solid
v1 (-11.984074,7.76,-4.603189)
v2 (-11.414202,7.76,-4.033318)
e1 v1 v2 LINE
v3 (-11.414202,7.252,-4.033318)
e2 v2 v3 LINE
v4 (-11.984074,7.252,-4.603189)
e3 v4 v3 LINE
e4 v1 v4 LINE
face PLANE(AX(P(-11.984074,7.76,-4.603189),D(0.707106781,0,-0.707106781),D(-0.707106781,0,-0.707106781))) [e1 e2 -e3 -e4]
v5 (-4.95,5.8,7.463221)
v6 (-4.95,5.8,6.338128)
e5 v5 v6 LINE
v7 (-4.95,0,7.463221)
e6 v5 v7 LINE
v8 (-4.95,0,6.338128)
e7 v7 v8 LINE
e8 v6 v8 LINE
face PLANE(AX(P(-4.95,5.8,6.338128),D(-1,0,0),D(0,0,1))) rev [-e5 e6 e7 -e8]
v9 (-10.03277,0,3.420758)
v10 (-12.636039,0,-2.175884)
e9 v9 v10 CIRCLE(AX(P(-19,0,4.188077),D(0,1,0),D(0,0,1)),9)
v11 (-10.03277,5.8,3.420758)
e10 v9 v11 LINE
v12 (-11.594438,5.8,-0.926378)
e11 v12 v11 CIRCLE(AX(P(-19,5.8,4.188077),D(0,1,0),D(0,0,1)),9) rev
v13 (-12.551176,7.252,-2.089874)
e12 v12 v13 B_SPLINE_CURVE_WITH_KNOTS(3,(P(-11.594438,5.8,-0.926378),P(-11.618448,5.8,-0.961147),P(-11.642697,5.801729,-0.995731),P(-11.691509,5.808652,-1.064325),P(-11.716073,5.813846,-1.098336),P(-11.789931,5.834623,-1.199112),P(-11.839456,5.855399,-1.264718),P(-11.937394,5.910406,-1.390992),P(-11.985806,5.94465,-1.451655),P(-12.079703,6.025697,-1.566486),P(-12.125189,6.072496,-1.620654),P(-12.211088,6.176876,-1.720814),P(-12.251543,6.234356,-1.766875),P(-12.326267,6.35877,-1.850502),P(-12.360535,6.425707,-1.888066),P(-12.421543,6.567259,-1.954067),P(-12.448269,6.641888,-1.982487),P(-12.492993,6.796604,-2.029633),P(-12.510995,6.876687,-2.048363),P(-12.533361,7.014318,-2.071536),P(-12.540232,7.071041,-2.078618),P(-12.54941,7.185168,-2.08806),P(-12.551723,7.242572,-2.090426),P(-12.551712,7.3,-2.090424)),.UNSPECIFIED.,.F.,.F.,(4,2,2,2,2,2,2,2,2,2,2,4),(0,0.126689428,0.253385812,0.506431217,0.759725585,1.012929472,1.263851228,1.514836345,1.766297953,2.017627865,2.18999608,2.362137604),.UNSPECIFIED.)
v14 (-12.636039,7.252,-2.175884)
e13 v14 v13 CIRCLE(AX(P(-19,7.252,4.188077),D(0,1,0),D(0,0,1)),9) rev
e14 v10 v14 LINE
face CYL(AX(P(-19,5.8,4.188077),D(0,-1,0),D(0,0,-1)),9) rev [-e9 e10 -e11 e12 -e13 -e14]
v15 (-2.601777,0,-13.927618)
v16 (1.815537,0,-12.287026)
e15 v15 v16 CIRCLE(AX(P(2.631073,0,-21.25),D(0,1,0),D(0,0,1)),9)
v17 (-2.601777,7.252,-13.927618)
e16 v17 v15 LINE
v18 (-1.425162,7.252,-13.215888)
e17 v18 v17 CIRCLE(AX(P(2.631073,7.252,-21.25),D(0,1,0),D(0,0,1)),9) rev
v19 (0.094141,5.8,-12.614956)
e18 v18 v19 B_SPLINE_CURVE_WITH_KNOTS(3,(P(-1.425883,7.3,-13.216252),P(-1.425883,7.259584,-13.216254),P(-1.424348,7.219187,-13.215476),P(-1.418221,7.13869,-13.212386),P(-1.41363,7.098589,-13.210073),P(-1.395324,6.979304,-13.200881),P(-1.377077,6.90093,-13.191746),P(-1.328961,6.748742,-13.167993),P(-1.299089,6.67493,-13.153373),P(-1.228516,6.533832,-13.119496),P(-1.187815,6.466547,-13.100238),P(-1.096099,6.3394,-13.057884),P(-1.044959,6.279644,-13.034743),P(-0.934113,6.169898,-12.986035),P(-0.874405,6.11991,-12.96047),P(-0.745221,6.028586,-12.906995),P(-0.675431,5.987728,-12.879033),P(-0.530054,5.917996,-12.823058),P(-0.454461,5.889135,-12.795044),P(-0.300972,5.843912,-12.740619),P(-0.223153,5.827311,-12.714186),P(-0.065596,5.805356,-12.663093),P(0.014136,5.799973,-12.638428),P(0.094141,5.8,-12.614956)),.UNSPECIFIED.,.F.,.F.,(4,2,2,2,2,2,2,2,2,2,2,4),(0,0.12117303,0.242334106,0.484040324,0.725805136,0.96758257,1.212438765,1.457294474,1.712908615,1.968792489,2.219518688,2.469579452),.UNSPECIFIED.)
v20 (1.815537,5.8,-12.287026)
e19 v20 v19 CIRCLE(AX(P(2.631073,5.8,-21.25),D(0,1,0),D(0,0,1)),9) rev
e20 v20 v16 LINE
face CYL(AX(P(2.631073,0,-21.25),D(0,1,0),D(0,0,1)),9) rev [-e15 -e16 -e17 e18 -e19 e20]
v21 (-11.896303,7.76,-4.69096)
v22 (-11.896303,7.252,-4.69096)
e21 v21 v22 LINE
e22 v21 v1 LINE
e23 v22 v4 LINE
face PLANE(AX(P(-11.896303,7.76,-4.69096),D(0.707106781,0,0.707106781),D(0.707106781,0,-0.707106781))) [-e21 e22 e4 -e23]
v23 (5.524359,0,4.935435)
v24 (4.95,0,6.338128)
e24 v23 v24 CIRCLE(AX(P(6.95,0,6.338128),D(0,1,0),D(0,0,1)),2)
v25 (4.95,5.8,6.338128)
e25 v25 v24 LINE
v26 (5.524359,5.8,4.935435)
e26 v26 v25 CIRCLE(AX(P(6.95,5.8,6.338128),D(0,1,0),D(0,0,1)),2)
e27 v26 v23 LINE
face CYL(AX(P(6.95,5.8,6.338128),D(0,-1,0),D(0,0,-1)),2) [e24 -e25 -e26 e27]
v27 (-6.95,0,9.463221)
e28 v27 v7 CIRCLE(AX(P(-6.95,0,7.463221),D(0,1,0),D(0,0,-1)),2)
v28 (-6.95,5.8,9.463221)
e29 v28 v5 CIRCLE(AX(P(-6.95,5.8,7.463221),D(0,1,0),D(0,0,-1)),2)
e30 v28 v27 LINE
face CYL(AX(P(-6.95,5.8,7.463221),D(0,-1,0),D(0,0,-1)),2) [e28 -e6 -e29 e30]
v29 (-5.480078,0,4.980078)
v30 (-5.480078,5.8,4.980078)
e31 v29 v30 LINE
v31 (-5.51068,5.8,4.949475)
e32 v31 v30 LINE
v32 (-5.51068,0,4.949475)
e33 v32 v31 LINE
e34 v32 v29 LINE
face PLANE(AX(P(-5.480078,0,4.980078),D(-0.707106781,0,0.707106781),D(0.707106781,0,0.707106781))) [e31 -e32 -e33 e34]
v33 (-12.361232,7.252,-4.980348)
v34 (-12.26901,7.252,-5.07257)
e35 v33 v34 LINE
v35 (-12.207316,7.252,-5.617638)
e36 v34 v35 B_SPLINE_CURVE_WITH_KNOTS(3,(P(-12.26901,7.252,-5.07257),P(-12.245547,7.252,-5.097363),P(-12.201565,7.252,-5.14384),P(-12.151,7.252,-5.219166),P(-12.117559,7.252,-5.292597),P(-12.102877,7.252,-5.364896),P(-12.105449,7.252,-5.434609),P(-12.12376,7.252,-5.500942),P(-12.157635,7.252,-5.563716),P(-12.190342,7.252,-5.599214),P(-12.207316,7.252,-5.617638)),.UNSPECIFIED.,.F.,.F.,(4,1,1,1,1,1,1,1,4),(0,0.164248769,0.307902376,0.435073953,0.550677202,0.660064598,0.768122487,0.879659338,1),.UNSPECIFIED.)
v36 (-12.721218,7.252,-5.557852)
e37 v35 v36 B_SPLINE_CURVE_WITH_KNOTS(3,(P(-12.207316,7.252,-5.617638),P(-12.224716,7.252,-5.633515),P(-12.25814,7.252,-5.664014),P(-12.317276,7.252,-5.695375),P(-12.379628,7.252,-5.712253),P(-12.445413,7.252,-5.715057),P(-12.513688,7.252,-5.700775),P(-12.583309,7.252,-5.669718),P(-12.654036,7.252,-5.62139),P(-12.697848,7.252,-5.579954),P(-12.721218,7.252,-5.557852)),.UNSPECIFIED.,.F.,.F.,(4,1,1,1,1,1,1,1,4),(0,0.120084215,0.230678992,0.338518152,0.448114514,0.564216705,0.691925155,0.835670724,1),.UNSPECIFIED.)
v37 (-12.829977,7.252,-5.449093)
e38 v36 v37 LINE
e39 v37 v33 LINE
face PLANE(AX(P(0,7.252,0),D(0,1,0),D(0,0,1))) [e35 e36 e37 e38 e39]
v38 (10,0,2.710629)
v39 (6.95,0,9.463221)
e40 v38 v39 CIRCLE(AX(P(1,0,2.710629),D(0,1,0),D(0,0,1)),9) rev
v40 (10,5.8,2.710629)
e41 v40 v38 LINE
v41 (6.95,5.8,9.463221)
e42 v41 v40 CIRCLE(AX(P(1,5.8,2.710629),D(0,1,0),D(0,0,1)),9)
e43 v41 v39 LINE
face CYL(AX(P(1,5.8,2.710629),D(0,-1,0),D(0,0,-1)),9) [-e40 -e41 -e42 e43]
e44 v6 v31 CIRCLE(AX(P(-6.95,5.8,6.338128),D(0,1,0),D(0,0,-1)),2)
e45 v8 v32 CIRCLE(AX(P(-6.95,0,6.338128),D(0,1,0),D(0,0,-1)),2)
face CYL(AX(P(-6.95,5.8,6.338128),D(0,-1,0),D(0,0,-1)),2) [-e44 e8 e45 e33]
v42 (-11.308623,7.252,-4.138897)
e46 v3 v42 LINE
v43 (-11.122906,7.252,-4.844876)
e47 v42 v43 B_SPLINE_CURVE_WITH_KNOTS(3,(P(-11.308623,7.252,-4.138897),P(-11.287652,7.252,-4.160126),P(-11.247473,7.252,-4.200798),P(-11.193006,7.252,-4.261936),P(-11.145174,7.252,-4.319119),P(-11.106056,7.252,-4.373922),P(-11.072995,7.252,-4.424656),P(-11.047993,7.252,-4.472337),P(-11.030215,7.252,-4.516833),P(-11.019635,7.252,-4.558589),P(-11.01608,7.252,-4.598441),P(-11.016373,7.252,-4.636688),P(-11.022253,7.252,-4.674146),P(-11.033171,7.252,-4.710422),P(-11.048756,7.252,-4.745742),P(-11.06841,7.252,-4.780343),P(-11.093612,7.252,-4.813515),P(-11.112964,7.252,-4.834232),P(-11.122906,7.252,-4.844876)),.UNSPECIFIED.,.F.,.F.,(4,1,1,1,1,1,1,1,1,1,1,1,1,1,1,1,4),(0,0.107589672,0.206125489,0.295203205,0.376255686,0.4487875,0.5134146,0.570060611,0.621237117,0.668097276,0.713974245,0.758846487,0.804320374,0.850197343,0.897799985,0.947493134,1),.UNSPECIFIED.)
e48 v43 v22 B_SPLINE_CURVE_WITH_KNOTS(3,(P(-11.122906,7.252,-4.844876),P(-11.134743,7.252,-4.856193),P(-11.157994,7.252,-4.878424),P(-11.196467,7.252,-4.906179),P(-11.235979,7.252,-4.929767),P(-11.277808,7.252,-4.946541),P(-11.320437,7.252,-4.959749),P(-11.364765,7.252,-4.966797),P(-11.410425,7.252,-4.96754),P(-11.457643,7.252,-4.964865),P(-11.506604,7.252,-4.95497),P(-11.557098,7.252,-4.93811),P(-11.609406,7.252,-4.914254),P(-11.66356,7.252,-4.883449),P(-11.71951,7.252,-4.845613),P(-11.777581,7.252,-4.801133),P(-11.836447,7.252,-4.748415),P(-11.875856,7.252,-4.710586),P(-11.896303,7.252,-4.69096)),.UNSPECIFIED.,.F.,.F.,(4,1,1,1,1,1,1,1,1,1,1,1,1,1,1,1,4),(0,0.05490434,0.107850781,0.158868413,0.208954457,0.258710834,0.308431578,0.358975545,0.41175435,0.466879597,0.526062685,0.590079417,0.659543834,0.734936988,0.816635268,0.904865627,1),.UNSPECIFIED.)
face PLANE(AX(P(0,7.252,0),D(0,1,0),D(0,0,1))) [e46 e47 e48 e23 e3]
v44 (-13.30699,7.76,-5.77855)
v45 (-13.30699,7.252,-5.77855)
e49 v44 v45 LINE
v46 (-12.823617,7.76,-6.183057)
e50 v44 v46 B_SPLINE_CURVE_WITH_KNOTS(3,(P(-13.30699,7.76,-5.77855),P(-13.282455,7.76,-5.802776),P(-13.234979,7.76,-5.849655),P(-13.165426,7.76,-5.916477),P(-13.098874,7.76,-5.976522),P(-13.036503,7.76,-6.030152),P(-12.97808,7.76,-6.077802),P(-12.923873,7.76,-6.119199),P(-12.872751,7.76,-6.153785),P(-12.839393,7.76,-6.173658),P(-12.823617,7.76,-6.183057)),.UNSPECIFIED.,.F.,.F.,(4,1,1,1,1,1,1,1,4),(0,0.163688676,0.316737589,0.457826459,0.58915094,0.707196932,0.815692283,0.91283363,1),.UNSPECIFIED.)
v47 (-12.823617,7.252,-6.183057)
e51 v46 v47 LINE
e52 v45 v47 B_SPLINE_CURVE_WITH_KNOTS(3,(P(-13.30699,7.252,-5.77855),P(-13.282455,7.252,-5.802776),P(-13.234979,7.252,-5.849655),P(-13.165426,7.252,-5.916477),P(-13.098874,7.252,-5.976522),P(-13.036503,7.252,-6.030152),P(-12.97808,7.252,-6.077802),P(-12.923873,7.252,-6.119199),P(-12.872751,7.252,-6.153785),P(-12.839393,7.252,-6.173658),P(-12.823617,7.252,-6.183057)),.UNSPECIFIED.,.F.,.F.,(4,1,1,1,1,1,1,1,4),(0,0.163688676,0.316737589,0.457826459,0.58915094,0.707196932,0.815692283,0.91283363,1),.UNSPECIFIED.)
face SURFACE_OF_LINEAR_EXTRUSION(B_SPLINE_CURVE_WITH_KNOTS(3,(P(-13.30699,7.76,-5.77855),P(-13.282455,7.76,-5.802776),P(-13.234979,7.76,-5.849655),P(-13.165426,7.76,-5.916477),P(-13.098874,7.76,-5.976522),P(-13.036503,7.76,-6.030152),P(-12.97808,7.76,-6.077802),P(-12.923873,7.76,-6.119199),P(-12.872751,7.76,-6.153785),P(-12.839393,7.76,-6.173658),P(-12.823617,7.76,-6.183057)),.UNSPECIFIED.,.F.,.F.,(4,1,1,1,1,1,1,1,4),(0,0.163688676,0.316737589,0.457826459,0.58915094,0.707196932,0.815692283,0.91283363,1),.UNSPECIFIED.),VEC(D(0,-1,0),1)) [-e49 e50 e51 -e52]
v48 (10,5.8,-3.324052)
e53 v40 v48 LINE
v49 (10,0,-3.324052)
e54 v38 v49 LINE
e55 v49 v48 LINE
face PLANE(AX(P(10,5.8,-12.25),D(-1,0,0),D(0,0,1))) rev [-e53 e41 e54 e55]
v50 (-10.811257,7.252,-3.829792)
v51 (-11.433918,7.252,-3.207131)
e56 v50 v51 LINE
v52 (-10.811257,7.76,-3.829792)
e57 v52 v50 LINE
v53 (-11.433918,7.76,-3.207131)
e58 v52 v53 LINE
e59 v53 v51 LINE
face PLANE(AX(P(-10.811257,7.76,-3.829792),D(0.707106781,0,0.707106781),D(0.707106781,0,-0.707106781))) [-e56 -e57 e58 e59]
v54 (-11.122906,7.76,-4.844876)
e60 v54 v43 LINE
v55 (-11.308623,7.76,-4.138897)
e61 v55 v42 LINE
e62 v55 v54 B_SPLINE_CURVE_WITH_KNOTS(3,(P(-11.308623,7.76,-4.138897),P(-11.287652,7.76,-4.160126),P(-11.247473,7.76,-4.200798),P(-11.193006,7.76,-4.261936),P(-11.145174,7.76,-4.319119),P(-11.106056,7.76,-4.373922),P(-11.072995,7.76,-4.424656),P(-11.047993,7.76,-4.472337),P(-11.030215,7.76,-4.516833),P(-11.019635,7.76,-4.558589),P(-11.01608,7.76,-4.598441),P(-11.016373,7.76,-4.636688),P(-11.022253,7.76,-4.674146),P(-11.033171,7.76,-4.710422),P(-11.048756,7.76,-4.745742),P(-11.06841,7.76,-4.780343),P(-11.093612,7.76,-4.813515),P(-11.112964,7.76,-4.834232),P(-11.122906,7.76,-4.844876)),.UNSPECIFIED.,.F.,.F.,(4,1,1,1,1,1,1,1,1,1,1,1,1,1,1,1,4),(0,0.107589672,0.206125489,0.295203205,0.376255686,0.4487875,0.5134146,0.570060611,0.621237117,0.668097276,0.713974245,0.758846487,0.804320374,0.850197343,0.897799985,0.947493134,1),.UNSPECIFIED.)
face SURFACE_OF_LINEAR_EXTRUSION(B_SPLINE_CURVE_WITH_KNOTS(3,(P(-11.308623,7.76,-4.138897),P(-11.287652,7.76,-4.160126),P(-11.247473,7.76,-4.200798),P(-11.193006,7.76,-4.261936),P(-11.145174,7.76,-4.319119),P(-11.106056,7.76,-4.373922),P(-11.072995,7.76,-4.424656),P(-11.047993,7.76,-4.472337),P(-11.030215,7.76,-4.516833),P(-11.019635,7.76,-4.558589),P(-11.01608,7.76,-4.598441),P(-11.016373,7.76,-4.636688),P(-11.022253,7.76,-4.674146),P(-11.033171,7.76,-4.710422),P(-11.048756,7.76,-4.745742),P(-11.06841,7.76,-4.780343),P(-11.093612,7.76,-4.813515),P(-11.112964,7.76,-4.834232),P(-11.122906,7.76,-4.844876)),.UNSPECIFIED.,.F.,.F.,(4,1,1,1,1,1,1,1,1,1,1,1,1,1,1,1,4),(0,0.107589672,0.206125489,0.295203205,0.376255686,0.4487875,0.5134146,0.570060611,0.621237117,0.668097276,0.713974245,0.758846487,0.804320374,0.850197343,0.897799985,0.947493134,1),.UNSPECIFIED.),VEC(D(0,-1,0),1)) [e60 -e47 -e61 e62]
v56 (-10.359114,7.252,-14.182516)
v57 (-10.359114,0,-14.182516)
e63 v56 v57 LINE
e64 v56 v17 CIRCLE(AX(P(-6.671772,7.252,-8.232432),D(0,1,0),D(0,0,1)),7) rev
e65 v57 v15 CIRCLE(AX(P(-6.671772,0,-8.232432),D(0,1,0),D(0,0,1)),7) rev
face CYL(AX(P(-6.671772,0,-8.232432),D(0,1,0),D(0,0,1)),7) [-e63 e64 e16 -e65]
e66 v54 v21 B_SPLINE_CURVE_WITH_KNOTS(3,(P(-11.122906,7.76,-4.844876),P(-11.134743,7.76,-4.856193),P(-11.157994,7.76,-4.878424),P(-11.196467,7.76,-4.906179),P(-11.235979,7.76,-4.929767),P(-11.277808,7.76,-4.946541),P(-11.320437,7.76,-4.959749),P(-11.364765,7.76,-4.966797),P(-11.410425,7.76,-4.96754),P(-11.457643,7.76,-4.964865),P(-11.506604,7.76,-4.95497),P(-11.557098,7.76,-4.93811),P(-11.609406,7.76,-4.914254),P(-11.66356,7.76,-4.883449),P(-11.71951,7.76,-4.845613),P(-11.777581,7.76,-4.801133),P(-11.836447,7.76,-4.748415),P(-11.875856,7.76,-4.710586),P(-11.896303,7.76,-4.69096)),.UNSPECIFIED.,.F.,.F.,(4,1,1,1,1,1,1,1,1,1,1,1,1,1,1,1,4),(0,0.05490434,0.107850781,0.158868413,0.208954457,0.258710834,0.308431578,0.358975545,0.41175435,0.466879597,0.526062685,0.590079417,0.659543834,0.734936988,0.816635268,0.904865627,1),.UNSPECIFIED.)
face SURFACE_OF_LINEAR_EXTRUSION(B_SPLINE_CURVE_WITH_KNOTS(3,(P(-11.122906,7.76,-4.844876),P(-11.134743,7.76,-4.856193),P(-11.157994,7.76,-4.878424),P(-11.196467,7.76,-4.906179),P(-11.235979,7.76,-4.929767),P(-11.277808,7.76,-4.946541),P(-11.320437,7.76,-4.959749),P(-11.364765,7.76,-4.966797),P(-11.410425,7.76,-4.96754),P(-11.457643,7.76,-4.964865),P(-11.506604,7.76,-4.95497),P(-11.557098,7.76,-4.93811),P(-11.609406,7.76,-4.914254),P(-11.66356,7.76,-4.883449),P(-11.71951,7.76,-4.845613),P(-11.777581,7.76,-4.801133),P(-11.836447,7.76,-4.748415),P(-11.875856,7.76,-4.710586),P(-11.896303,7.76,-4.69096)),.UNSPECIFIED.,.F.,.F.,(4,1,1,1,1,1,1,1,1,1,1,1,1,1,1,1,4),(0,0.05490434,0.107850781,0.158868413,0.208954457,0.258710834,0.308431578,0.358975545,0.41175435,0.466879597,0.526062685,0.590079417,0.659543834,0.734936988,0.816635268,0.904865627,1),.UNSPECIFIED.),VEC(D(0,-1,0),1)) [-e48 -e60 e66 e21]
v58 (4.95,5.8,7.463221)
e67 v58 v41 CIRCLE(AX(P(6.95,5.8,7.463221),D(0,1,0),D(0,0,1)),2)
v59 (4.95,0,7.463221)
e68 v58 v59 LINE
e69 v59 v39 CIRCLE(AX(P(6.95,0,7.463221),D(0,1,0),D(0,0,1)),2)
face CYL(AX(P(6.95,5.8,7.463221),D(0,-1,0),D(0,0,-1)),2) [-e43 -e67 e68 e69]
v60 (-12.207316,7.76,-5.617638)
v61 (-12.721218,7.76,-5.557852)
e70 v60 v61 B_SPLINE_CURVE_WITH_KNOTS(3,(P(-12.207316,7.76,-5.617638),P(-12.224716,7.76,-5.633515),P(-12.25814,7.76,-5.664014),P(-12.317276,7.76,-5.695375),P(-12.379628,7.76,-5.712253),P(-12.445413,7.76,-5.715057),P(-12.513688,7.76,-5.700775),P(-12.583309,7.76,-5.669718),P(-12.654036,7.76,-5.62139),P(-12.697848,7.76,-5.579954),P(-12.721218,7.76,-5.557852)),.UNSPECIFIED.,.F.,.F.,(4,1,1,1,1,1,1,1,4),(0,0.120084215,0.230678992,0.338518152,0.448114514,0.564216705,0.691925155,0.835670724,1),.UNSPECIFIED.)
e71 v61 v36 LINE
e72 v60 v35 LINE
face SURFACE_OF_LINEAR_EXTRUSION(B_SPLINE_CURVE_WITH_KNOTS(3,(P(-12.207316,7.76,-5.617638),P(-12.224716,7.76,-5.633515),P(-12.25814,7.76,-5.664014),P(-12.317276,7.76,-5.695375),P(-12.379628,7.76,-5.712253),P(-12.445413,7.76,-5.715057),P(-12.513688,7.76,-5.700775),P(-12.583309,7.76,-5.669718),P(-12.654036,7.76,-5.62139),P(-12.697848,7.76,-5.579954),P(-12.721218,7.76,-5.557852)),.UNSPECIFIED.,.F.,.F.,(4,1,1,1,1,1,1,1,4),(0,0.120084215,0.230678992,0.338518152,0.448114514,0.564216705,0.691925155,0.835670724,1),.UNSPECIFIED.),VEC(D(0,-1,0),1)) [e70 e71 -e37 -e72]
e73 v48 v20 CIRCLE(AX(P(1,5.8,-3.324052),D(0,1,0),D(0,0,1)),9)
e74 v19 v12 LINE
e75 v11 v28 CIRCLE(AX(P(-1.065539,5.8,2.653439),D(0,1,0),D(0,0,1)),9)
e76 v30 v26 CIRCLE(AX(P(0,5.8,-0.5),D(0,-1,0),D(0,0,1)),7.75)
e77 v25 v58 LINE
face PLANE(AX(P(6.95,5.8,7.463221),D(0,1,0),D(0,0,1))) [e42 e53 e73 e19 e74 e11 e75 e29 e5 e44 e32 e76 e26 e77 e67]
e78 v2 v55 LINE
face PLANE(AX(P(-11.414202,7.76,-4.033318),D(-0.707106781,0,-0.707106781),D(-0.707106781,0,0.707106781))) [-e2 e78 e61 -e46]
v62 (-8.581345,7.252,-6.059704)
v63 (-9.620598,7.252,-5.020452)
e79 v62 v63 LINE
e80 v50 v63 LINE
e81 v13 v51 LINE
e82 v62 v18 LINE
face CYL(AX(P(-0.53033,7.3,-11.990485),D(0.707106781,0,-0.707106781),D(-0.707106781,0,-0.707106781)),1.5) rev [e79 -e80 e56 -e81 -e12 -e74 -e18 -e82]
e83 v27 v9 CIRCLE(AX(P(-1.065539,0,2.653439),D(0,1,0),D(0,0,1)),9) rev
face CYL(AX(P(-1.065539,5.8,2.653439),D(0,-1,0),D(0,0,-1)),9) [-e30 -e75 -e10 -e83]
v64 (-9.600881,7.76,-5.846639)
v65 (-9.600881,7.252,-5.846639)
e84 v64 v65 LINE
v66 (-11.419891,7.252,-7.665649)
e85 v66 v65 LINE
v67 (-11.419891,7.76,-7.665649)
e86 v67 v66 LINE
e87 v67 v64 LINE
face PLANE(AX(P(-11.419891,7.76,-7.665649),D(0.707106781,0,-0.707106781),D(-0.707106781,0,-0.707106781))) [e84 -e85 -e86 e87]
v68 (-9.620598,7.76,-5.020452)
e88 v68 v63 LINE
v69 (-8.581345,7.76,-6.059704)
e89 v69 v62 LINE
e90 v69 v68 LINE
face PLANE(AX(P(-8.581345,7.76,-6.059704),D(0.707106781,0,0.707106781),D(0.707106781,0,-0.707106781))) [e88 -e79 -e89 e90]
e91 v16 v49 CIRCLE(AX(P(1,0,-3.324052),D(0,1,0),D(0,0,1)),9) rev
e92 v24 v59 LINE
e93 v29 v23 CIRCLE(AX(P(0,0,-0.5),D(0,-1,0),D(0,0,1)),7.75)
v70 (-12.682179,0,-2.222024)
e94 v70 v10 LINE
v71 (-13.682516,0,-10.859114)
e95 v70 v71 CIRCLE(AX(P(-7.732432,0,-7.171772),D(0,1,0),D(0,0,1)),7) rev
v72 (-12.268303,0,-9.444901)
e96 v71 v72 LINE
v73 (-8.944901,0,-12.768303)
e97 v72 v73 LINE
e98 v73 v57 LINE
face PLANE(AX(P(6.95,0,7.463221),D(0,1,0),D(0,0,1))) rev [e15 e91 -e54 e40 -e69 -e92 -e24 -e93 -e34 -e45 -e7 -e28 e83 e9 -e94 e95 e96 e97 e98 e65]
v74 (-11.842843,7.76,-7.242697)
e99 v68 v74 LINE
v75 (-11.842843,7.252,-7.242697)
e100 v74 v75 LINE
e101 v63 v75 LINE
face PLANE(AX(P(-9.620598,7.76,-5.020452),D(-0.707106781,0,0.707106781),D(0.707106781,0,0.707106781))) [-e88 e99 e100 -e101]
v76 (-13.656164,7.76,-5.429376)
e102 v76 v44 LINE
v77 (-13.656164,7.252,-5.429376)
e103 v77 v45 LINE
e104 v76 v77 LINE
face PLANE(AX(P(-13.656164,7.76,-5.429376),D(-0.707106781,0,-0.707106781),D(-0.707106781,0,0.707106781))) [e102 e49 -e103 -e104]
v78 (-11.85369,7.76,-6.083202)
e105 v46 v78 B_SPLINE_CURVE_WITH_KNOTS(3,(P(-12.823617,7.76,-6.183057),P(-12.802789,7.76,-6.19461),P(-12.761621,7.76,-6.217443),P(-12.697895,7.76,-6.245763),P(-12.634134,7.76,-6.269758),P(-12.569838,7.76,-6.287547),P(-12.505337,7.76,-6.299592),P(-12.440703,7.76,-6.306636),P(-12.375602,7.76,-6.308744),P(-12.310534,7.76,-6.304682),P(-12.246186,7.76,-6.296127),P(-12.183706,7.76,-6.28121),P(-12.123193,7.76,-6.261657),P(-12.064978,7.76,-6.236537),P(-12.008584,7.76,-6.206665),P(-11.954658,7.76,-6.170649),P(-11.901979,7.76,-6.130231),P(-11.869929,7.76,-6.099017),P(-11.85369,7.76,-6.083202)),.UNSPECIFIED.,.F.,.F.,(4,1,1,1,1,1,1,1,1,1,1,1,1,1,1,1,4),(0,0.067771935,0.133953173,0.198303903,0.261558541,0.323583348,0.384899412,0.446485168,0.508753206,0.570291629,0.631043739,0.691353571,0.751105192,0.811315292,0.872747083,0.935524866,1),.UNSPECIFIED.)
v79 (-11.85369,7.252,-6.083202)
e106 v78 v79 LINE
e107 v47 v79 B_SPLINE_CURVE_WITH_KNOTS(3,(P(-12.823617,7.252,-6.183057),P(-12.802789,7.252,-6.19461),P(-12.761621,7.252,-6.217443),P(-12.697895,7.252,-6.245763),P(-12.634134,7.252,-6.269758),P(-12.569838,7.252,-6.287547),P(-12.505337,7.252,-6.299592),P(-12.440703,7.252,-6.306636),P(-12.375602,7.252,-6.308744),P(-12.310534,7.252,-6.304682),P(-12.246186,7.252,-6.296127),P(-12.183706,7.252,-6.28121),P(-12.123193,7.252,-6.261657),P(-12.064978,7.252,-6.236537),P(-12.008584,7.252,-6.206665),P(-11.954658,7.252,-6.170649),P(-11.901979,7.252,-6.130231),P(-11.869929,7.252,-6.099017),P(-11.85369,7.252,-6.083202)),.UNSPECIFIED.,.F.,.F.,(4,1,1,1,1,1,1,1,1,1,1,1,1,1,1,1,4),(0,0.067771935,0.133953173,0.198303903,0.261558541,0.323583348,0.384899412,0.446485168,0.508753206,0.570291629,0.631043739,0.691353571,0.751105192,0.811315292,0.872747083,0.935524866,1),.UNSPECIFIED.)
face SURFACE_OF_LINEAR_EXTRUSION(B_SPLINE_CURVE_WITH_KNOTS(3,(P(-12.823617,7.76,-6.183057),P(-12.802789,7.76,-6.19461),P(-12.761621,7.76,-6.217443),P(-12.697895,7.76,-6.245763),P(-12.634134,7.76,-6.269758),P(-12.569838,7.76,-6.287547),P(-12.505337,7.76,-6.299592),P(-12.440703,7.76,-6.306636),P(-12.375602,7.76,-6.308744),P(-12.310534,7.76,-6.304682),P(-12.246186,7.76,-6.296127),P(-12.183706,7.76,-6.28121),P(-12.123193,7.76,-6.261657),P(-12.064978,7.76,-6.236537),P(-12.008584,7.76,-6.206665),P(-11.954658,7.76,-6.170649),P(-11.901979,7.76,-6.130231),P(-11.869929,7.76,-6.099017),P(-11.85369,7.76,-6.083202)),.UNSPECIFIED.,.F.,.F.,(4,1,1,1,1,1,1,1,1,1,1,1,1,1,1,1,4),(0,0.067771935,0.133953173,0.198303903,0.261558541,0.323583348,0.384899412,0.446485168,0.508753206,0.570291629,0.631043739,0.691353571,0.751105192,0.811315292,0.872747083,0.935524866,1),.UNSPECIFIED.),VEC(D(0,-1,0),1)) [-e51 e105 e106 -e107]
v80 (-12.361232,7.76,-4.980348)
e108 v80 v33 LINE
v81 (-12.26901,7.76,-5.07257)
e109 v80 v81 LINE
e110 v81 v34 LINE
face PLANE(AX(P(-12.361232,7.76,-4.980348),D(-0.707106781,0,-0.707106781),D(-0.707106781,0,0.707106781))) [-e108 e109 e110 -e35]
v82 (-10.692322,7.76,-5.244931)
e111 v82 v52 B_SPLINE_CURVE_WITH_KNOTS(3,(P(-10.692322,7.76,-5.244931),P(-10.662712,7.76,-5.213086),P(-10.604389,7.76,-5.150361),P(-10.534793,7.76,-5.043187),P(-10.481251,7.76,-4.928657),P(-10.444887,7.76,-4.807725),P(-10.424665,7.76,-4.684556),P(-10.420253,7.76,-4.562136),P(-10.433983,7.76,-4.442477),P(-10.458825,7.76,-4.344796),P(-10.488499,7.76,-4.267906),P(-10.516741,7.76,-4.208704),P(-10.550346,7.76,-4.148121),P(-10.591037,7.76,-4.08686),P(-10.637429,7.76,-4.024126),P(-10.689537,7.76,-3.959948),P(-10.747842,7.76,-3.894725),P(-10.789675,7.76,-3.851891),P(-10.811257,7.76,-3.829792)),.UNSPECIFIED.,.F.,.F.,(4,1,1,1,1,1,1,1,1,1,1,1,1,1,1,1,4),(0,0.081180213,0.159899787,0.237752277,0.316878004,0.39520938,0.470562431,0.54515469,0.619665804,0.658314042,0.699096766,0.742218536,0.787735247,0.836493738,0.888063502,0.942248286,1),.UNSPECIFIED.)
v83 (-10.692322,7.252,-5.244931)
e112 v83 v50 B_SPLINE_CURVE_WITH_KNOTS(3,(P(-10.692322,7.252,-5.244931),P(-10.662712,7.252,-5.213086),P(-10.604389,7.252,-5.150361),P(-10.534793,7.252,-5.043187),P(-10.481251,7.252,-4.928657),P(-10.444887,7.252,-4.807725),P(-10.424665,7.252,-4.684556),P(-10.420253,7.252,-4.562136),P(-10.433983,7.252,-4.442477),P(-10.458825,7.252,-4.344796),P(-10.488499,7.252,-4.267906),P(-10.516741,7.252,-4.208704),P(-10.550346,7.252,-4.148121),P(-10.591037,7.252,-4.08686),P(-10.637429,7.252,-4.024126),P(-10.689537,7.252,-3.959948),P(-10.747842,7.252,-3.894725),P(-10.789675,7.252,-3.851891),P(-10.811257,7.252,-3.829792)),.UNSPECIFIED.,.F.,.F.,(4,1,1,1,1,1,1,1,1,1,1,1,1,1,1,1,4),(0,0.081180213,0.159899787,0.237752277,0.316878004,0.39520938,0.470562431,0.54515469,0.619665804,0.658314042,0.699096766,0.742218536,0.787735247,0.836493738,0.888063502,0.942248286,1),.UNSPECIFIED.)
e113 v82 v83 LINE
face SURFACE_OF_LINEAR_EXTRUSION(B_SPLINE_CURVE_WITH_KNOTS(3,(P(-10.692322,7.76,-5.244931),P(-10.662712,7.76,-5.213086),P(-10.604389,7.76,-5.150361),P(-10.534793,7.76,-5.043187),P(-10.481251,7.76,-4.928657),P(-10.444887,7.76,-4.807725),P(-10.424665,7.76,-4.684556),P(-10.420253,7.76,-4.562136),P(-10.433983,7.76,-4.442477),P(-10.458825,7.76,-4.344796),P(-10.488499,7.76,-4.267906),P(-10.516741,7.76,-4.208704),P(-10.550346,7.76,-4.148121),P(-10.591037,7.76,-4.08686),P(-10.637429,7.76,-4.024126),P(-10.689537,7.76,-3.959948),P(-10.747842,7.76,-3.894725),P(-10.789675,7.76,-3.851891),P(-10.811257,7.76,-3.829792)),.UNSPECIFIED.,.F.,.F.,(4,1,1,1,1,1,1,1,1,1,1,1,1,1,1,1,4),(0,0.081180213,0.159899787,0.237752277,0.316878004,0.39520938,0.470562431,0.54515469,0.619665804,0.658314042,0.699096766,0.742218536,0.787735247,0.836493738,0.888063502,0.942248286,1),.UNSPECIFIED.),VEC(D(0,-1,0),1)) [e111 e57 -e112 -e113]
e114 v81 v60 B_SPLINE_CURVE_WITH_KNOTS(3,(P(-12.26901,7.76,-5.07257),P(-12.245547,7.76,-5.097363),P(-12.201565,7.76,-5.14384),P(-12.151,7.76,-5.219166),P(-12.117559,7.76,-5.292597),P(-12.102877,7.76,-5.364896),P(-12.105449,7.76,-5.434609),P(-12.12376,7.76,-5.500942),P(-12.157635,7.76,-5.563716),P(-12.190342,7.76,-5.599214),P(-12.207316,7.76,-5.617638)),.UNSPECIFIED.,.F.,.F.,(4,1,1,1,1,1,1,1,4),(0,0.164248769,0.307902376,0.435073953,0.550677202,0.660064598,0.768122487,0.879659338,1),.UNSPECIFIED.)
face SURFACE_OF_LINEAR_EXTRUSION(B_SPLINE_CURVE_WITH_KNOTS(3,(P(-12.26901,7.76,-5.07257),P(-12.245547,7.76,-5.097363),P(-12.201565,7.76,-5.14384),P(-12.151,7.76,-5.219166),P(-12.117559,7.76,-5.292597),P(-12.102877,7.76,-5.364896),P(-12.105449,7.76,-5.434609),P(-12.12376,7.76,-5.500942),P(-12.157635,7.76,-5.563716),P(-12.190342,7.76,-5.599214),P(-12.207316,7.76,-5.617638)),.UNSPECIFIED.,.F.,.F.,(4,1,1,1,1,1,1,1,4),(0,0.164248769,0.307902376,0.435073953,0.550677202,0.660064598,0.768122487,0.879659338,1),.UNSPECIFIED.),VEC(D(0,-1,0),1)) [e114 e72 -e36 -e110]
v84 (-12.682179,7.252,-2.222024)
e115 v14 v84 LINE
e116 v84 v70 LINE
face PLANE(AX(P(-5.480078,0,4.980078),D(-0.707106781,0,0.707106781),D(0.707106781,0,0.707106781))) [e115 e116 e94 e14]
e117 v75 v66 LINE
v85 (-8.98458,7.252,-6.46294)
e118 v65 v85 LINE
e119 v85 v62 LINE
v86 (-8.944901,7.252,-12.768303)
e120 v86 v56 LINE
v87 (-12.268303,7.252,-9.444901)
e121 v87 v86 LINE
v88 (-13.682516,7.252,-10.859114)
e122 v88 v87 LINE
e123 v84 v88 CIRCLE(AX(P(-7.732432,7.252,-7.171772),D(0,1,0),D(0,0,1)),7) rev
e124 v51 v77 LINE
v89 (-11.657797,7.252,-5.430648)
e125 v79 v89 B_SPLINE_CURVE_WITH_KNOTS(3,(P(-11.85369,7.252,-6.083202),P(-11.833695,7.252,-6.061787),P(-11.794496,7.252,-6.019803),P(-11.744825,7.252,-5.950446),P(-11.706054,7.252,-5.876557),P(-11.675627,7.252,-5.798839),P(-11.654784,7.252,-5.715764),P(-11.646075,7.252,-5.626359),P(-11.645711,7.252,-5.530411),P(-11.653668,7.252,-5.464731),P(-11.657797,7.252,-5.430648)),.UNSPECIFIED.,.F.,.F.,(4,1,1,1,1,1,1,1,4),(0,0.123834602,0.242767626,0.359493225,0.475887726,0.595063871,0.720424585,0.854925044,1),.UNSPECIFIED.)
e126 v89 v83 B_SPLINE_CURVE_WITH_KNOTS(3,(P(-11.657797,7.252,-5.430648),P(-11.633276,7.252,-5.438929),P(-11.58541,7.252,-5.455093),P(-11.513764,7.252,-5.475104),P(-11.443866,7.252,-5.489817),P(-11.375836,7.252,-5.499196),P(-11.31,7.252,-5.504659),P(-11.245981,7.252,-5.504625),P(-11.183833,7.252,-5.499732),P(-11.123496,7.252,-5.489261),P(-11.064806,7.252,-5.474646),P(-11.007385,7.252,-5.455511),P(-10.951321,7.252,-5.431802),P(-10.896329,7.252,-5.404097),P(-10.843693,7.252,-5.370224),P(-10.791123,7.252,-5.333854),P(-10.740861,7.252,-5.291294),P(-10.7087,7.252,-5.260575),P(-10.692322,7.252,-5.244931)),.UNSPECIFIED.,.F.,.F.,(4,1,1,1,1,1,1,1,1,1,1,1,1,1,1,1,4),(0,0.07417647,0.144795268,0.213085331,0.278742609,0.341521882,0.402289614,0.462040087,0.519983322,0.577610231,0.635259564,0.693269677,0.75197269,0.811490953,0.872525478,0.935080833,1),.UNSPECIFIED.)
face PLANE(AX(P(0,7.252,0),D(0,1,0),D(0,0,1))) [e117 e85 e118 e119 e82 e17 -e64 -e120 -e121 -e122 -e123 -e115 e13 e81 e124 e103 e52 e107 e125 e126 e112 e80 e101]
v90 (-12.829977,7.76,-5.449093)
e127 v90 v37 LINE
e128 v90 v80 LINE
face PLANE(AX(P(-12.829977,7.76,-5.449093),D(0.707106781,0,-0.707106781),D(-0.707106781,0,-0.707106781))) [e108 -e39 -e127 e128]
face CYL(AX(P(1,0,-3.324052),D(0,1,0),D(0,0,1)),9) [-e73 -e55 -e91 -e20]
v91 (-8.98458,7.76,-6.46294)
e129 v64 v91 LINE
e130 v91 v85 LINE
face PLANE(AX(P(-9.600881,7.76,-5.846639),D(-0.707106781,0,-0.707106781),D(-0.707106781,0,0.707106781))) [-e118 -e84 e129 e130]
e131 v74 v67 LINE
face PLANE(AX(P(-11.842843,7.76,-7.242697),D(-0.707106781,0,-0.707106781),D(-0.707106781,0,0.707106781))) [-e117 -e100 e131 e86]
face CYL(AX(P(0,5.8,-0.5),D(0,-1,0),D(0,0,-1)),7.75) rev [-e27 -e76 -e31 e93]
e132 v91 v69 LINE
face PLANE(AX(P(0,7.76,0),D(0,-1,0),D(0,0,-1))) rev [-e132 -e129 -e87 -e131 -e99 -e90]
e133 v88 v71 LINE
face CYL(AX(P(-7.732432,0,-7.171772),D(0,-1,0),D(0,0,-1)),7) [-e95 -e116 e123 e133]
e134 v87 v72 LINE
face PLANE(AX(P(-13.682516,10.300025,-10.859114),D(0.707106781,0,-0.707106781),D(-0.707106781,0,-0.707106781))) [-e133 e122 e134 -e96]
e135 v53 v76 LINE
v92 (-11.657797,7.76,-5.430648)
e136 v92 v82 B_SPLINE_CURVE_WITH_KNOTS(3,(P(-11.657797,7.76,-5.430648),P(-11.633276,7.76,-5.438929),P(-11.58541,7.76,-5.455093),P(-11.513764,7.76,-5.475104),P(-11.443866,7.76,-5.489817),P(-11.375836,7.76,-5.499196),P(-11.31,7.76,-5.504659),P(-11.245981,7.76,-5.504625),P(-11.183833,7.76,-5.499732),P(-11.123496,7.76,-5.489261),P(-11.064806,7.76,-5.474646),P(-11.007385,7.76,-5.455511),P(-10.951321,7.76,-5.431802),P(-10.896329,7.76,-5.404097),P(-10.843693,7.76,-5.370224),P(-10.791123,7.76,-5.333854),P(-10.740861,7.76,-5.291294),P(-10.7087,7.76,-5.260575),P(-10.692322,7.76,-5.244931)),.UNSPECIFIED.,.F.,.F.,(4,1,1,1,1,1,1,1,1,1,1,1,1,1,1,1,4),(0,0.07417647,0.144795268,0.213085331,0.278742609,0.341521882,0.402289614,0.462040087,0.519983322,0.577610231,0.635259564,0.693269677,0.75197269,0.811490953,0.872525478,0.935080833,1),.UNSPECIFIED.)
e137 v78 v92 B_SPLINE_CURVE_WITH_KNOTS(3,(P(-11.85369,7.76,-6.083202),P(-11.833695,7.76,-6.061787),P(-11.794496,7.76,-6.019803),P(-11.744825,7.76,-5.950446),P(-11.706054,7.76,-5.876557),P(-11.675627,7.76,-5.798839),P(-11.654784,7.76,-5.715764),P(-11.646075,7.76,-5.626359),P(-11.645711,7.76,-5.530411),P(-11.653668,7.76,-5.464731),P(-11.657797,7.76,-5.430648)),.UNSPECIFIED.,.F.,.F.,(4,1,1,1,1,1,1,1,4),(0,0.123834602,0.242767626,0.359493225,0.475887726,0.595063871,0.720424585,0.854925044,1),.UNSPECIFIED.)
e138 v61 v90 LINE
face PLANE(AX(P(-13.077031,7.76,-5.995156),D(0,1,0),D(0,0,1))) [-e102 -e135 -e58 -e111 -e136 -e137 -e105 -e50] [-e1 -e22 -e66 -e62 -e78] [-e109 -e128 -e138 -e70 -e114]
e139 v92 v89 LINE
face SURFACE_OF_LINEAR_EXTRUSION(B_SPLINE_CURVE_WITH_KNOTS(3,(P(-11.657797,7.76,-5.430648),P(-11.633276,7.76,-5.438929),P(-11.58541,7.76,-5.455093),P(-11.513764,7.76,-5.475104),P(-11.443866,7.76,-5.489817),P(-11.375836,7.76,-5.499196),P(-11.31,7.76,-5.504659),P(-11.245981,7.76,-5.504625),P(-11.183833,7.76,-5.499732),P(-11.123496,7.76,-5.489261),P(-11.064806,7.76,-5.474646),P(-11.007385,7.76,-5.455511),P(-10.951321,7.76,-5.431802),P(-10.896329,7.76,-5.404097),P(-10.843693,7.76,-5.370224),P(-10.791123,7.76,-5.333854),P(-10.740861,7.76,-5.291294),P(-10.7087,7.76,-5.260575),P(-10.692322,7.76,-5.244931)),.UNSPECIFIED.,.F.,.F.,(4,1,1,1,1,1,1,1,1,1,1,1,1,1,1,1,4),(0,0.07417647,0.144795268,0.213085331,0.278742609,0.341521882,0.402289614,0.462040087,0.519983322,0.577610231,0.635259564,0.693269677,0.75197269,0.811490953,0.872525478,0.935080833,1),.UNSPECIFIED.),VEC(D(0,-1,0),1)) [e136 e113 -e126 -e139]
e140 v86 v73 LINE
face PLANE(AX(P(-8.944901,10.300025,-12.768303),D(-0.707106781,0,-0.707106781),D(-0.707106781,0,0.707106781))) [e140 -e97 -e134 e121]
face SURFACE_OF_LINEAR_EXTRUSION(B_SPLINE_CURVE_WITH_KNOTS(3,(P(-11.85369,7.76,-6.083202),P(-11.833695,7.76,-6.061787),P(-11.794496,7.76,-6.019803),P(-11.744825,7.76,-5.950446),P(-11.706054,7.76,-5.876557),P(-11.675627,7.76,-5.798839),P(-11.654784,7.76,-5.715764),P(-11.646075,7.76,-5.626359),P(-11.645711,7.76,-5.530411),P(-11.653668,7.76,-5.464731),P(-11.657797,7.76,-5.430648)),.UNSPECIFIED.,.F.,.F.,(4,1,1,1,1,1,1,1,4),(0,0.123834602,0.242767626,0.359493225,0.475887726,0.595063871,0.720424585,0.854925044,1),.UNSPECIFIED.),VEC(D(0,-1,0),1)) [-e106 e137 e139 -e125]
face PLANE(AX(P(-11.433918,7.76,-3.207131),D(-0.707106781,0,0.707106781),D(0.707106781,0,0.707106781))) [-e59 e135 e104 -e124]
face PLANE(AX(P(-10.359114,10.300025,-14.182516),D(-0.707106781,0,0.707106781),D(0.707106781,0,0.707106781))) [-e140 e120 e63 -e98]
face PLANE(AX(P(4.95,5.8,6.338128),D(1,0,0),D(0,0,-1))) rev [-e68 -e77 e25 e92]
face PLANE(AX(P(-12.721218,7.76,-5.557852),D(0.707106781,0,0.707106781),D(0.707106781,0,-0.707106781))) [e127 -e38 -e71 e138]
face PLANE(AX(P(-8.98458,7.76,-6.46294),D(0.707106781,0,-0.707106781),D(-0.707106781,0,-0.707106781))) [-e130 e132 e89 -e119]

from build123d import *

# Parameters (mm, degrees)
BOSS_EXTRUDE1_DEPTH     = 5.8
BOSS_EXTRUDE2_START     = -5.8
BOSS_EXTRUDE2_DEPTH     = 5.8
BOSS_EXTRUDE3_DEPTH     = 4.5
CUT_EXTRUDE1_DEPTH      = 26.767293083
CUT_EXTRUDE1_DEPTH_BACK = 26.767293083
FILLET6_R               = 7
FILLET7_R               = 7
FILLET8_R               = 9
FILLET9_R               = 9
FILLET10_R              = 9
FILLET11_R              = 9
FILLET12_DEPTH          = 5.8
FILLET13_R              = 1.5
SKETCH11_W              = 22.477586639
SKETCH11_H              = 16.715029759
CUT_EXTRUDE3_DEPTH      = 3.048
BOSS_EXTRUDE4_DEPTH     = 0.508


with BuildPart() as part:
    # Sketch1 → Boss-Extrude1 (new body)
    with BuildSketch(Plane(origin=(0, 0, 0), x_dir=(1, 0, 0), z_dir=(0, 1, 0))):
        with BuildLine():
            Line((10, 12.25), (-10, 12.25))
            Line((-10, 12.25), (-10, -7.463220606))
            Line((-10, -7.463220606), (-10, -9.463220606))
            Line((-10, -9.463220606), (-8, -9.463220606))
            Line((-8, -9.463220606), (-6.95, -9.463220606))
            ThreePointArc((-6.95, -9.463220606), (-5.535786438, -8.877434169), (-4.95, -7.463220606))
            Line((-4.95, -7.463220606), (-4.95, -6.338128399))
            ThreePointArc((-4.95, -6.338128399), (-5.099151269, -5.580263652), (-5.524358974, -4.935435394))
            ThreePointArc((-5.524358974, -4.935435394), (0, 8.25), (5.524358974, -4.935435394))
            ThreePointArc((5.524358974, -4.935435394), (5.099151269, -5.580263652), (4.95, -6.338128399))
            Line((4.95, -6.338128399), (4.95, -7.463220606))
            ThreePointArc((4.95, -7.463220606), (5.535786438, -8.877434169), (6.95, -9.463220606))
            Line((6.95, -9.463220606), (8, -9.463220606))
            Line((8, -9.463220606), (10, -9.463220606))
            Line((10, -9.463220606), (10, -7.463220606))
            Line((10, -7.463220606), (10, 12.25))
        make_face()
    extrude(amount=BOSS_EXTRUDE1_DEPTH)

    # Sketch5 → Boss-Extrude2 (add)
    with BuildSketch(Plane(origin=(0, 5.8, 0), x_dir=(1, 0, 0), z_dir=(0, 1, 0)).offset(BOSS_EXTRUDE2_START)):
        with BuildLine():
            Line((5.480077554, 5.980077554), (-6.540737726, 18.000892834))
            Line((-6.540737726, 18.000892834), (-17.500892834, 7.040737726))
            Line((-17.500892834, 7.040737726), (-5.480077554, -4.980077554))
            ThreePointArc((-5.480077554, -4.980077554), (-5.480077554, 5.980077554), (5.480077554, 5.980077554))
        make_face()
    extrude(amount=BOSS_EXTRUDE2_DEPTH)

    # Sketch7 → Boss-Extrude3 (add)
    with BuildSketch(Plane(origin=(0, 5.8, 0), x_dir=(1, 0, 0), z_dir=(0, 1, 0))):
        Polygon((-1.590990258, 13.051145366), (-6.540737726, 18.000892834), (-17.500892834, 7.040737726), (-12.551145366, 2.090990258), align=None)
    extrude(amount=BOSS_EXTRUDE3_DEPTH)

    # Sketch8 → Cut-Extrude1 (cut, two sides: drawn at the far end of the back side and taken through both)
    with BuildSketch(Plane(origin=(0, 5.8, 0), x_dir=(1, 0, 0), z_dir=(0, 1, 0)).offset(-CUT_EXTRUDE1_DEPTH_BACK)):
        Polygon((-10.359114344, 14.182516216), (-8.944900782, 12.768302654), (-12.268302654, 9.444900782), (-13.682516216, 10.859114344), align=None)
    extrude(amount=CUT_EXTRUDE1_DEPTH + CUT_EXTRUDE1_DEPTH_BACK, mode=Mode.SUBTRACT)

    # Fillet6
    # the kernel refuses this fillet: 7 mm, written as the material it takes off along each edge
    with BuildSketch(Plane(origin=(-17.500892834, -17.036725037, -7.040737726), x_dir=(0.7071067811865471, 0, 0.707106781186548), z_dir=(0, 1, 0))) as fillet6_piece_1:
        with BuildLine():
            CenterArc((6.814690015, 7), FILLET6_R, 193.21298036, 76.78701964)
            Line((0, 5.4), (-0.1362938, 5.368))
            ThreePointArc((-0.1362938, 5.368), (-0.14, 2.7), (-0.14, 0))
            Line((-0.14, 0), (0, -0.14))
            Line((0, -0.14), (6.814690015, -0.14))
            Line((6.814690015, -0.14), (6.814690015, 0))
        make_face()
    extrude(amount=44.373450075, mode=Mode.SUBTRACT)

    # Fillet7
    # the kernel refuses this fillet: 7 mm, written as the material it takes off along each edge
    with BuildSketch(Plane(origin=(-6.540737726, -17.036725037, -18.000892834), x_dir=(-0.7071067811865467, 0, 0.7071067811865485), z_dir=(0, 1, 0))) as fillet7_piece_1:
        with BuildLine():
            CenterArc((7, 6.814690015), FILLET7_R, 180, 76.78701964)
            Line((0, 6.814690015), (-0.14, 6.814690015))
            Line((-0.14, 6.814690015), (-0.14, 0))
            Line((-0.14, 0), (0, -0.14))
            ThreePointArc((0, -0.14), (2.7, -0.14), (5.368, -0.1362938))
            Line((5.368, -0.1362938), (5.4, 0))
        make_face()
    extrude(amount=44.373450075, mode=Mode.SUBTRACT)

    # Fillet8
    # the kernel refuses this fillet: 9 mm, written as the material it adds along each edge
    with BuildSketch(Plane(origin=(-0.789844892, 14.352294771, -12.25), x_dir=(-0.7337802799425581, 0, -0.6793868564870981), z_dir=(0, -1, 0))) as fillet8_piece_1_section:
        with BuildLine():
            CenterArc((3.604279608, 8.928149184), FILLET8_R, 227.204251593, 35.551028785)
            Line((-2.510202101, 2.324126664), (-3.121650271, 1.663724412))
            Line((-3.121650271, 1.663724412), (-0.611448171, -0.660402252))
            Line((-0.611448171, -0.660402252), (0.034615763, -0.899334059))
            ThreePointArc((0.034615763, -0.899334059), (1.351940933, -0.848629634), (2.355814908, -0.892814918))
            Line((2.355814908, -0.892814918), (2.469311699, 0))
        make_face()
    fillet8_piece_1 = extrude(amount=14.352294771, mode=Mode.PRIVATE)
    fillet8_piece_1 = split(fillet8_piece_1, bisect_by=Plane(origin=(-0.789844892, 5.8, -12.25), z_dir=(0, 1, 0)), keep=Keep.TOP, mode=Mode.PRIVATE)
    fillet8_piece_1 = split(fillet8_piece_1, bisect_by=Plane(origin=(-0.789844892, 10.3, -12.25), z_dir=(0, -1, 0)), keep=Keep.TOP, mode=Mode.PRIVATE)
    fillet8_piece_1 = split(fillet8_piece_1, bisect_by=Plane(origin=(-1.590990258, 14.352294771, -13.051145366), z_dir=(-0.7071067811865475, 0, -0.7071067811865476)), keep=Keep.TOP, mode=Mode.PRIVATE)
    add(fillet8_piece_1)
    with BuildSketch(Plane(origin=(-0.789844892, 5.8, -12.25), x_dir=(-0.7337802799425581, 0, -0.6793868564870981), z_dir=(0, -1, 0))) as fillet8_piece_2_section:
        with BuildLine():
            CenterArc((3.604279608, 8.928149184), FILLET8_R, 227.204251593, 35.551028785)
            Line((-2.510202101, 2.324126664), (-3.121650271, 1.663724412))
            Line((-3.121650271, 1.663724412), (-0.611448171, -0.660402252))
            Line((-0.611448171, -0.660402252), (0.034615763, -0.899334059))
            ThreePointArc((0.034615763, -0.899334059), (1.351940933, -0.848629634), (2.355814908, -0.892814918))
            Line((2.355814908, -0.892814918), (2.469311699, 0))
        make_face()
    fillet8_piece_2 = extrude(amount=5.8, mode=Mode.PRIVATE)
    fillet8_piece_2 = split(fillet8_piece_2, bisect_by=Plane(origin=(-1.590990258, 5.8, -13.051145366), z_dir=(-0.7071067811865475, 0, -0.7071067811865476)), keep=Keep.TOP, mode=Mode.PRIVATE)
    add(fillet8_piece_2)
    with BuildSketch(Plane(origin=(-0.789844892, 5.8, -12.25), x_dir=(-0.7337802799425581, 0, -0.6793868564870981), z_dir=(0, -1, 0))) as fillet8_piece_3_section:
        with BuildLine():
            CenterArc((3.604279608, 8.928149184), FILLET8_R, 227.204251593, 35.551028785)
            Line((-2.510202101, 2.324126664), (-3.121650271, 1.663724412))
            Line((-3.121650271, 1.663724412), (-0.611448171, -0.660402252))
            Line((-0.611448171, -0.660402252), (0.034615763, -0.899334059))
            ThreePointArc((0.034615763, -0.899334059), (1.351940933, -0.848629634), (2.355814908, -0.892814918))
            Line((2.355814908, -0.892814918), (2.469311699, 0))
        make_face()
    fillet8_piece_3 = extrude(amount=5.8, mode=Mode.PRIVATE)
    fillet8_piece_3 = split(fillet8_piece_3, bisect_by=Plane(origin=(-1.590990258, 5.8, -13.051145366), z_dir=(0.7071067811865475, 0, 0.7071067811865476)), keep=Keep.TOP, mode=Mode.PRIVATE)
    add(fillet8_piece_3)

    # Fillet9
    fillet9_edges = [part.edges().sort_by_distance(p)[0] for p in [
        (10, 2.9, -12.25),
    ]]
    fillet(fillet9_edges, radius=FILLET9_R)

    # Fillet10
    fillet10_edges = [part.edges().sort_by_distance(p)[0] for p in [
        (-10, 2.9, 0.460155108),
    ]]
    fillet(fillet10_edges, radius=FILLET10_R)

    # Fillet11
    # the kernel refuses this fillet: 9 mm, written as the material it takes off along each edge
    with BuildSketch(Plane(origin=(10, -16.881480237, 9.463220606), x_dir=(0, 0, -1), z_dir=(0, 1, 0))) as fillet11_piece_1:
        with BuildLine():
            CenterArc((6.752592095, 9), FILLET11_R, 221.384667587, 48.615332413)
            Line((0, 3.05), (0, 0))
            Line((0, 0), (6.752592095, 0))
        make_face()
    extrude(amount=39.562960474, mode=Mode.SUBTRACT)

    # Fillet12: read off the stored shape, not the designer's step
    # Fillet12 outline → Fillet12 (cut)
    with BuildSketch(Plane(origin=(0, 0, 0), x_dir=(1, 0, 0), z_dir=(0, 1, 0))):
        with BuildLine():
            Line((-10, -9.463220606), (-6.95, -9.463220606))
            ThreePointArc((-6.95, -9.463220606), (-9.082460071, -6.743546791), (-10.032769562, -3.42075828))
            ThreePointArc((-10.032769562, -3.42075828), (-10.008196123, -3.804068015), (-10, -4.18807717))
            Line((-10, -4.18807717), (-10, -9.463220606))
        make_face()
    extrude(amount=FILLET12_DEPTH, mode=Mode.SUBTRACT)

    # Fillet13
    fillet13_edges = [part.edges().sort_by_distance(p)[0] for p in [
        (-6.988797537, 5.8, -7.653338087),
    ]]
    fillet(fillet13_edges, radius=FILLET13_R)

    # Sketch11 → Cut-Extrude3 (cut)
    with BuildSketch(Plane(origin=(0, 10.3, 0), x_dir=(1, 0, 0), z_dir=(0, 1, 0))):
        with Locations((-8.183279801, 8.85751488)):
            Rectangle(SKETCH11_W, SKETCH11_H)
    extrude(amount=-CUT_EXTRUDE3_DEPTH, mode=Mode.SUBTRACT)

    # Sketch12 → Boss-Extrude4 (add)
    # profile 1 of 2: a face of its own
    with BuildSketch(Plane(origin=(0, 7.252, 0), x_dir=(1, 0, 0), z_dir=(0, 1, 0))):
        with BuildLine():
            Line((-11.433918494, 3.207130735), (-13.656164087, 5.429376328))
            Line((-13.656164087, 5.429376328), (-13.306990409, 5.778550006))
            add(Edge.make_bspline(
                [(-13.306990409, 5.778550006), (-13.282454925, 5.802776429), (-13.234978761, 5.849654556), (-13.165425965, 5.916476582), (-13.098874205, 5.976521512), (-13.036503263, 6.030151615), (-12.978079516, 6.077802204), (-12.923873082, 6.119198581), (-12.872751416, 6.153785376), (-12.839393353, 6.173658456), (-12.823617012, 6.183057218)],
                knots=[0, 0, 0, 0, 1.309509407, 2.53390071, 3.662611673, 4.713207521, 5.65757546, 6.525538268, 7.302669039, 8, 8, 8, 8], degree=3))
            add(Edge.make_bspline(
                [(-12.823617012, 6.183057218), (-12.802788726, 6.194609559), (-12.761621022, 6.217443093), (-12.697895295, 6.245762593), (-12.634133803, 6.269757801), (-12.56983835, 6.287547266), (-12.505336684, 6.299591985), (-12.440703357, 6.30663579), (-12.375602361, 6.30874407), (-12.310534388, 6.304682079), (-12.246186103, 6.296126998), (-12.183706133, 6.281210456), (-12.123192616, 6.26165718), (-12.064977726, 6.236536624), (-12.008583815, 6.206665212), (-11.954657564, 6.170648612), (-11.90197945, 6.130230589), (-11.86992907, 6.099017275), (-11.853690129, 6.08320245)],
                knots=[0, 0, 0, 0, 1.084350962, 2.143250767, 3.172862443, 4.184936649, 5.177333569, 6.158390596, 7.143762693, 8.140051288, 9.124666062, 10.096699818, 11.061657142, 12.017683079, 12.981044671, 13.963953334, 14.96839786, 16, 16, 16, 16], degree=3))
            add(Edge.make_bspline(
                [(-11.853690129, 6.08320245), (-11.833695098, 6.061786816), (-11.794496473, 6.019803215), (-11.744824985, 5.950445998), (-11.706053697, 5.876556968), (-11.675627227, 5.798838873), (-11.654783836, 5.715764393), (-11.646075384, 5.626358621), (-11.645711155, 5.530411251), (-11.653667868, 5.464730746), (-11.657796699, 5.430648363)],
                knots=[0, 0, 0, 0, 0.99067682, 1.942141011, 2.875945802, 3.80710181, 4.760510965, 5.763396677, 6.839400355, 8, 8, 8, 8], degree=3))
            add(Edge.make_bspline(
                [(-11.657796699, 5.430648363), (-11.633275636, 5.438929098), (-11.585409595, 5.455093403), (-11.51376359, 5.47510442), (-11.443865679, 5.489816624), (-11.375836479, 5.499196125), (-11.310000456, 5.504659461), (-11.245981468, 5.504624925), (-11.183832662, 5.499731758), (-11.123495787, 5.489260877), (-11.064806043, 5.474646149), (-11.007384688, 5.455511461), (-10.951320622, 5.43180242), (-10.896328629, 5.404097033), (-10.843692728, 5.370224131), (-10.791123294, 5.333853803), (-10.74086075, 5.291293515), (-10.708700331, 5.26057519), (-10.69232194, 5.244931216)],
                knots=[0, 0, 0, 0, 1.186823522, 2.316724293, 3.409365292, 4.459881737, 5.464350107, 6.43663382, 7.392641392, 8.319733159, 9.241763701, 10.164153021, 11.092314833, 12.031563043, 12.983855256, 13.960407647, 14.961293332, 16, 16, 16, 16], degree=3))
            add(Edge.make_bspline(
                [(-10.69232194, 5.244931216), (-10.662711688, 5.213086008), (-10.604388694, 5.150360848), (-10.534792676, 5.043187191), (-10.481250771, 4.928657287), (-10.444886915, 4.807724635), (-10.424665152, 4.684555752), (-10.42025279, 4.562136178), (-10.433983306, 4.442477202), (-10.458824615, 4.344796), (-10.488499119, 4.267905532), (-10.516741098, 4.208703935), (-10.550346141, 4.148121342), (-10.591037263, 4.086860175), (-10.63742873, 4.02412579), (-10.689537148, 3.959947573), (-10.747842318, 3.894725101), (-10.789674593, 3.851891338), (-10.811257236, 3.829791993)],
                knots=[0, 0, 0, 0, 1.298883416, 2.558396595, 3.804036434, 5.070048068, 6.323350088, 7.528998892, 8.722475042, 9.914652862, 10.533024677, 11.18554826, 11.875496583, 12.603763947, 13.383899814, 14.209016025, 15.075972575, 16, 16, 16, 16], degree=3))
            Line((-10.811257236, 3.829791993), (-11.433918494, 3.207130735))
        make_face()
        with BuildLine():
            Line((-12.829977188, 5.449092875), (-12.361232196, 4.980347883))
            Line((-12.361232196, 4.980347883), (-12.26900964, 5.072570439))
            add(Edge.make_bspline(
                [(-12.26900964, 5.072570439), (-12.245547401, 5.097363095), (-12.201564855, 5.143839654), (-12.151000295, 5.219166085), (-12.11755893, 5.292596724), (-12.102877282, 5.364895711), (-12.105448894, 5.434609358), (-12.123760352, 5.500941866), (-12.1576345, 5.563715502), (-12.190341519, 5.599214265), (-12.20731593, 5.617637546)],
                knots=[0, 0, 0, 0, 1.313990156, 2.46321901, 3.480591621, 4.405417619, 5.280516781, 6.144979895, 7.037274703, 8, 8, 8, 8], degree=3))
            add(Edge.make_bspline(
                [(-12.20731593, 5.617637546), (-12.224715574, 5.633514603), (-12.258139887, 5.664014062), (-12.317275844, 5.695374701), (-12.379628221, 5.712252715), (-12.445412797, 5.71505704), (-12.513687531, 5.700774859), (-12.583309359, 5.669718369), (-12.654035915, 5.621389649), (-12.697848327, 5.57995397), (-12.721218174, 5.557851889)],
                knots=[0, 0, 0, 0, 0.960673721, 1.845431933, 2.708145215, 3.584916116, 4.513733637, 5.535401244, 6.685365794, 8, 8, 8, 8], degree=3))
            Line((-12.721218174, 5.557851889), (-12.829977188, 5.449092875))
        make_face(mode=Mode.SUBTRACT)
        with BuildLine():
            Line((-11.984073743, 4.603189429), (-11.414201948, 4.033317634))
            Line((-11.414201948, 4.033317634), (-11.308623022, 4.13889656))
            add(Edge.make_bspline(
                [(-11.308623022, 4.13889656), (-11.287651539, 4.160125932), (-11.24747336, 4.200798187), (-11.193005753, 4.261936492), (-11.145174295, 4.319119162), (-11.106056354, 4.373922053), (-11.07299492, 4.424655747), (-11.047992974, 4.472337233), (-11.030214568, 4.516833005), (-11.019635078, 4.558588812), (-11.016079733, 4.598440863), (-11.016373314, 4.636687691), (-11.022252608, 4.674146416), (-11.033171282, 4.710421862), (-11.04875569, 4.745741652), (-11.068410481, 4.780342887), (-11.093612184, 4.813514625), (-11.112963719, 4.834232165), (-11.122905874, 4.844876128)],
                knots=[0, 0, 0, 0, 1.721434749, 3.298007816, 4.723251275, 6.020090977, 7.180600004, 8.214633596, 9.120969771, 9.939793866, 10.689556408, 11.423587917, 12.141543794, 12.869125978, 13.603157487, 14.364799764, 15.159890143, 16, 16, 16, 16], degree=3))
            add(Edge.make_bspline(
                [(-11.122905874, 4.844876128), (-11.134742573, 4.856193135), (-11.157993871, 4.878423583), (-11.196466572, 4.906178829), (-11.235979242, 4.929767363), (-11.277807887, 4.946541189), (-11.320437005, 4.959748589), (-11.364765118, 4.966796848), (-11.410425135, 4.967539842), (-11.45764275, 4.96486473), (-11.506603908, 4.95497), (-11.557098065, 4.938110069), (-11.609405881, 4.914253737), (-11.663559766, 4.883449423), (-11.719510391, 4.845612711), (-11.777580747, 4.801132935), (-11.836446723, 4.748415198), (-11.875856498, 4.710586414), (-11.89630331, 4.690959862)],
                knots=[0, 0, 0, 0, 0.878469438, 1.725612497, 2.541894601, 3.343271312, 4.139373348, 4.934905255, 5.743608715, 6.588069601, 7.470073549, 8.417002956, 9.441270676, 10.552701352, 11.758991805, 13.066164284, 14.47785003, 16, 16, 16, 16], degree=3))
            Line((-11.89630331, 4.690959862), (-11.984073743, 4.603189429))
        make_face(mode=Mode.SUBTRACT)
    # profile 2 of 2: a face of its own
    with BuildSketch(Plane(origin=(0, 7.252, 0), x_dir=(1, 0, 0), z_dir=(0, 1, 0))):
        Polygon((-11.84284314, 7.242697276), (-11.419891417, 7.665648998), (-9.600881, 5.846638582), (-8.984579919, 6.462939663), (-8.581344742, 6.059704487), (-9.620597547, 5.020451683), align=None)
    extrude(amount=BOSS_EXTRUDE4_DEPTH)


solid = part.part
